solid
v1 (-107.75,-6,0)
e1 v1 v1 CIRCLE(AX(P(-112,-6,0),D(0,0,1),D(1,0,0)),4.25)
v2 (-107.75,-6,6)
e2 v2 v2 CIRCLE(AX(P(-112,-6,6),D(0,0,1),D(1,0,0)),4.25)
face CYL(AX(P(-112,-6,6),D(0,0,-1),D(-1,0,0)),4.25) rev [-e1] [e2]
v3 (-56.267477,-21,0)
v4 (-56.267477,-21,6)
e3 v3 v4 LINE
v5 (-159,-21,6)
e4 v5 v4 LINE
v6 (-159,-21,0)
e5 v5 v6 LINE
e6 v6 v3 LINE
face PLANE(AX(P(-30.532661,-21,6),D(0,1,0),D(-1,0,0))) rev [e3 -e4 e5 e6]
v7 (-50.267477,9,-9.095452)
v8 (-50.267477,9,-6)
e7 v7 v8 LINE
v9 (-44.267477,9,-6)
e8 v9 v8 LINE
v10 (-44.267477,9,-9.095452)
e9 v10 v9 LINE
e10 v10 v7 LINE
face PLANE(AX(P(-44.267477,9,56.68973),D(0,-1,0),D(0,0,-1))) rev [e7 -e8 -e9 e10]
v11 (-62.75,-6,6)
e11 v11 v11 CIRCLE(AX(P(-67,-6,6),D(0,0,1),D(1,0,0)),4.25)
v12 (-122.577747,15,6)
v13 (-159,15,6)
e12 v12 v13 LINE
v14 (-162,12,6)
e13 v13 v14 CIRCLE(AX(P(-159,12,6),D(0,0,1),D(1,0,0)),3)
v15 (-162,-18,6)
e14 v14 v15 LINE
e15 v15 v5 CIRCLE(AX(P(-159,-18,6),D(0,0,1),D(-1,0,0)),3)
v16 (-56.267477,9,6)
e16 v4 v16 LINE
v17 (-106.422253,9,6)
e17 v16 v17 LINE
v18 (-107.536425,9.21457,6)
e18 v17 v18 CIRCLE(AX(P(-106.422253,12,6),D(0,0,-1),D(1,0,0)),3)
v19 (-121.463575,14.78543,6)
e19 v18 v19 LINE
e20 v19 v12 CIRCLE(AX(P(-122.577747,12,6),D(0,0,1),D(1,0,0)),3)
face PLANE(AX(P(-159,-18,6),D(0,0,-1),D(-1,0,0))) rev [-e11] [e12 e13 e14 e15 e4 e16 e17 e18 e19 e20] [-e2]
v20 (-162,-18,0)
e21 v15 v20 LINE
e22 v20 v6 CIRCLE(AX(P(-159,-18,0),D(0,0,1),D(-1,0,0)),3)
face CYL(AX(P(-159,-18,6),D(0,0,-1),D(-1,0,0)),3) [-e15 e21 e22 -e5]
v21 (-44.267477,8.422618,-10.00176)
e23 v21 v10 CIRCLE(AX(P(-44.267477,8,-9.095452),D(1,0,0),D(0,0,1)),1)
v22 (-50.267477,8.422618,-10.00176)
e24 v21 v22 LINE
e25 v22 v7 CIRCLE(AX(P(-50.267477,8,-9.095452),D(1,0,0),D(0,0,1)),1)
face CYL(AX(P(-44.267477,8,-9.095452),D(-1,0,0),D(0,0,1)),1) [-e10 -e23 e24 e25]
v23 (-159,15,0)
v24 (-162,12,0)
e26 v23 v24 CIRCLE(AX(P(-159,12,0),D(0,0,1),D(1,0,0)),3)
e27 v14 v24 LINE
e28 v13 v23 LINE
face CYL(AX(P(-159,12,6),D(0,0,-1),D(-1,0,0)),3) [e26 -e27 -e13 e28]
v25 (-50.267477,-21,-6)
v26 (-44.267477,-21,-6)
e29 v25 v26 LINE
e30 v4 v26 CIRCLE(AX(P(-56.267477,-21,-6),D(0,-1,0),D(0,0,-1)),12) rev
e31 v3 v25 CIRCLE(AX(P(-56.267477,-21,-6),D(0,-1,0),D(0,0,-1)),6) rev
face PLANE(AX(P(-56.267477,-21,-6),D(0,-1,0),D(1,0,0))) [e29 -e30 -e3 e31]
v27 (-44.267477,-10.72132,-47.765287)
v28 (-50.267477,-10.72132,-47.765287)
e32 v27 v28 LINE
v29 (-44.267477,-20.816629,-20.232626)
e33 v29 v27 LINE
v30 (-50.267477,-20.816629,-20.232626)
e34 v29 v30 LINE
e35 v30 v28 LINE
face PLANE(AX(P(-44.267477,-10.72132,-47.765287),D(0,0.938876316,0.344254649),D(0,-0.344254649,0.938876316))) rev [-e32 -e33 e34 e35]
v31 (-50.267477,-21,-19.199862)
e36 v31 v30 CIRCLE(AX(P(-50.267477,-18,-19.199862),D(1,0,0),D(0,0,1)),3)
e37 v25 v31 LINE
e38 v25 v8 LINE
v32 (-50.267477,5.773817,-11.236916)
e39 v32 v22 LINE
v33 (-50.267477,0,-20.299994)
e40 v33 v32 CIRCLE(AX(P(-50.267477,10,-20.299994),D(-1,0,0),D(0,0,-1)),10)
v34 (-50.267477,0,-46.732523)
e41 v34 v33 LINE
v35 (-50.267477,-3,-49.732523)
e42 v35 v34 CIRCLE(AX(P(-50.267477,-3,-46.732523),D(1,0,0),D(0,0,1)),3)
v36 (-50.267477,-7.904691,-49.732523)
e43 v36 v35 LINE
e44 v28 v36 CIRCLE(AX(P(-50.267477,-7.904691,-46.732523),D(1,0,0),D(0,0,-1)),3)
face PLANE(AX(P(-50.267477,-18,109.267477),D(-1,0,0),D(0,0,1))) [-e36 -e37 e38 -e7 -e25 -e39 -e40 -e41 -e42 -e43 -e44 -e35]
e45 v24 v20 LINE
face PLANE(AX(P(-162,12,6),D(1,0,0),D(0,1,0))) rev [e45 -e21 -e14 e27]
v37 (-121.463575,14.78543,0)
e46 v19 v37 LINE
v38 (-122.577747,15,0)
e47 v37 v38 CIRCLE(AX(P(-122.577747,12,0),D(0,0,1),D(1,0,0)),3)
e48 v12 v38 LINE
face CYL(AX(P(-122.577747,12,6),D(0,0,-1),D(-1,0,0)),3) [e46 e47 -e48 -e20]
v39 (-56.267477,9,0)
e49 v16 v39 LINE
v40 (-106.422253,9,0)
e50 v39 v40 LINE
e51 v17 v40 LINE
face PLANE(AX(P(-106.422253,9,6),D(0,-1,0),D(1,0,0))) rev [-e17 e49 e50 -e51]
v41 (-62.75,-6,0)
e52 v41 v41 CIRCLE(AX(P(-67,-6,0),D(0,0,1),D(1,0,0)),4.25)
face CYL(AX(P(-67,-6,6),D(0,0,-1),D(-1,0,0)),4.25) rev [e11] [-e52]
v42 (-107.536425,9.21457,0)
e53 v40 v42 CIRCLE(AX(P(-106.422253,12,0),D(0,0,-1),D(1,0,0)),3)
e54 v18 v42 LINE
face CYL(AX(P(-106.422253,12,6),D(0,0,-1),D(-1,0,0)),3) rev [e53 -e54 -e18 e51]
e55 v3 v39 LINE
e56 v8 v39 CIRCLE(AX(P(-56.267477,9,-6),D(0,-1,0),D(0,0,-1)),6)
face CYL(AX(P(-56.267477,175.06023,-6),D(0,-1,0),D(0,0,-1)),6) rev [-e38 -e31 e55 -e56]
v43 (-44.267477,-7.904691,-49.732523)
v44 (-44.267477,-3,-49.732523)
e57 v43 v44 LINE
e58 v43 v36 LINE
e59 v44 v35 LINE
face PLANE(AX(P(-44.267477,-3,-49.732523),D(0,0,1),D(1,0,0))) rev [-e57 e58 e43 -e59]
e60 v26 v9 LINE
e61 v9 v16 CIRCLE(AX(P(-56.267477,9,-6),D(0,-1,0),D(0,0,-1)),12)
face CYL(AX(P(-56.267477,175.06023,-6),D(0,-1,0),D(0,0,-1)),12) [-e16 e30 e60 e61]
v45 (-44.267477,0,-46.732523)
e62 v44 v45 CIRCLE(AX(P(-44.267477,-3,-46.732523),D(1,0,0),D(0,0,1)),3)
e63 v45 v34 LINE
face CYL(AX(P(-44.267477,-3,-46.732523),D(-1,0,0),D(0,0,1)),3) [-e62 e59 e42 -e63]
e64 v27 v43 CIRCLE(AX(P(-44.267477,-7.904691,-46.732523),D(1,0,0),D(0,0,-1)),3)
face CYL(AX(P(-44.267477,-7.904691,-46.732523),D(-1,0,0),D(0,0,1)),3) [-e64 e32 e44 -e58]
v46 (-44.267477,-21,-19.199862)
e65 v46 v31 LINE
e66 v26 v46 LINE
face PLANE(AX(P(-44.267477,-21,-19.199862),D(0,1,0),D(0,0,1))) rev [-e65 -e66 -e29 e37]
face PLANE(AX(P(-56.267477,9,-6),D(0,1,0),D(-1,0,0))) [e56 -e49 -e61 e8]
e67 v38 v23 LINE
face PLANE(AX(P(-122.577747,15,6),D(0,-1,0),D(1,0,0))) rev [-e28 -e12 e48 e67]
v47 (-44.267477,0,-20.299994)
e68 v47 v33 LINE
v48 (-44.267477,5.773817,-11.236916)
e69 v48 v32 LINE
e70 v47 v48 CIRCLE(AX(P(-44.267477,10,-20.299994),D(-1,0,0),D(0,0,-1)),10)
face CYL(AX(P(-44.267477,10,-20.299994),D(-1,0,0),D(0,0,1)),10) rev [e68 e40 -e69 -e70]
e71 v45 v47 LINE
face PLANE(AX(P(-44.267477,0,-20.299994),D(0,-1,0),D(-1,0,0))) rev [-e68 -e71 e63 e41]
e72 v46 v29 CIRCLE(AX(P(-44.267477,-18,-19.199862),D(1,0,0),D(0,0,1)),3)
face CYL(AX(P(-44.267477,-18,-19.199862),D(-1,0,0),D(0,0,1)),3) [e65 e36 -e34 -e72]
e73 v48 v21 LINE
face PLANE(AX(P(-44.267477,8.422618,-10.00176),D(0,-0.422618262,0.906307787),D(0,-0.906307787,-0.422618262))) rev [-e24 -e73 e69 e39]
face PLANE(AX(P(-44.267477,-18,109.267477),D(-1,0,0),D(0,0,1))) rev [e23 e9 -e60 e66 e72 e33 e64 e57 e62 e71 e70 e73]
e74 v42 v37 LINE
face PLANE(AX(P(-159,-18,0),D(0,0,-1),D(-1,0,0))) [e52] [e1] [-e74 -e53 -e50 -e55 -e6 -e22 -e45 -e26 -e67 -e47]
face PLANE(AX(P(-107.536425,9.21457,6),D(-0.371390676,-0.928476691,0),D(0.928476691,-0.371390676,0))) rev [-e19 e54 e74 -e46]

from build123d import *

# Parameters (mm, degrees)
SKETCH1_R                = 4.25
EXTRUDE1_DEPTH           = 6
PROCESS_BENDS1_START     = -45.500357344
PROCESS_BENDS1_OUTLINE_W = 30
PROCESS_BENDS1_OUTLINE_H = 6
PROCESS_BENDS1_DEPTH     = 45.500357344
PROCESS_BENDS1_START_2   = -50.267477344
PROCESS_BENDS1_2_DEPTH   = 4.83288
PROCESS_BENDS1_START_3   = -56.267477344
PROCESS_BENDS1_3_DEPTH   = 6
PROCESS_BENDS1_START_4   = -45.434597344
PROCESS_BENDS1_4_DEPTH   = 1.16712
PROCESS_BENDS1_START_5   = -21
PROCESS_BENDS1_5_DEPTH   = 30


with BuildPart() as part:
    # Sketch1 → Extrude1 (new body)
    with BuildSketch(Plane.XY):
        with BuildLine():
            Line((-106.422252789, 9), (-40.637070261, 9))
            ThreePointArc((-40.637070261, 9), (-40.099770652, 8.843391446), (-39.730762474, 8.422618262))
            Line((-39.730762474, 8.422618262), (-38.495606339, 5.773817383))
            ThreePointArc((-38.495606339, 5.773817383), (-34.805524552, 1.566085542), (-29.432528469, 0))
            Line((-29.432528469, 0), (-3, 0))
            ThreePointArc((-3, 0), (-0.878679656, -0.878679656), (0, -3))
            Line((0, -3), (0, -7.904690938))
            ThreePointArc((0, -7.904690938), (-0.540498847, -9.622495956), (-1.967236053, -10.721319886))
            Line((-1.967236053, -10.721319886), (-29.49989713, -20.816628948))
            ThreePointArc((-29.49989713, -20.816628948), (-30.008202711, -20.95380152), (-30.532661077, -21))
            Line((-30.532661077, -21), (-159, -21))
            ThreePointArc((-159, -21), (-161.121320344, -20.121320344), (-162, -18))
            Line((-162, -18), (-162, 12))
            ThreePointArc((-162, 12), (-161.121320344, 14.121320344), (-159, 15))
            Line((-159, 15), (-122.577747211, 15))
            ThreePointArc((-122.577747211, 15), (-122.010424647, 14.94586916), (-121.463575182, 14.785430073))
            Line((-121.463575182, 14.785430073), (-107.536424818, 9.214569927))
            ThreePointArc((-107.536424818, 9.214569927), (-106.989575353, 9.05413084), (-106.422252789, 9))
        make_face()
        with Locations((-67, -6)):
            Circle(SKETCH1_R, mode=Mode.SUBTRACT)
        with Locations((-112, -6)):
            Circle(SKETCH1_R, mode=Mode.SUBTRACT)
    extrude(amount=EXTRUDE1_DEPTH)

    # Process-Bends1: read off the stored shape, not the designer's step
    # Process-Bends1 outline → Process-Bends1 (cut)
    with BuildSketch(Plane.YZ.offset(PROCESS_BENDS1_START)):
        with Locations((-6, 3)):
            Rectangle(PROCESS_BENDS1_OUTLINE_W, PROCESS_BENDS1_OUTLINE_H)
    extrude(amount=PROCESS_BENDS1_DEPTH, mode=Mode.SUBTRACT)

    # Process-Bends1 2 outline → Process-Bends1 2 (add)
    with BuildSketch(Plane.YZ.offset(PROCESS_BENDS1_START_2)):
        with BuildLine():
            Line((5.773817383, -11.236916317), (8.422618262, -10.001760182))
            ThreePointArc((8.422618262, -10.001760182), (8.843391446, -9.632752004), (9, -9.095452395))
            Line((9, -9.095452395), (9, 0))
            Line((9, 0), (-21, 0))
            Line((-21, 0), (-21, -19.199861579))
            ThreePointArc((-21, -19.199861579), (-20.95380152, -19.724319945), (-20.816628948, -20.232625526))
            Line((-20.816628948, -20.232625526), (-10.721319886, -47.765286604))
            ThreePointArc((-10.721319886, -47.765286604), (-9.622495956, -49.192023809), (-7.904690938, -49.732522656))
            Line((-7.904690938, -49.732522656), (-3, -49.732522656))
            ThreePointArc((-3, -49.732522656), (-0.878679656, -48.853843), (0, -46.732522656))
            Line((0, -46.732522656), (0, -20.299994188))
            ThreePointArc((0, -20.299994188), (1.566085542, -14.926998104), (5.773817383, -11.236916317))
        make_face()
    extrude(amount=PROCESS_BENDS1_2_DEPTH)

    # Process-Bends1 3 outline → Process-Bends1 3 (add)
    with BuildSketch(Plane.YZ.offset(PROCESS_BENDS1_START_3)):
        with BuildLine():
            Line((5.773817383, -11.236916317), (8.422618262, -10.001760182))
            ThreePointArc((8.422618262, -10.001760182), (8.843391446, -9.632752004), (9, -9.095452395))
            Line((9, -9.095452395), (9, 0))
            Line((9, 0), (-21, 0))
            Line((-21, 0), (-21, -19.199861579))
            ThreePointArc((-21, -19.199861579), (-20.95380152, -19.724319945), (-20.816628948, -20.232625526))
            Line((-20.816628948, -20.232625526), (-10.721319886, -47.765286604))
            ThreePointArc((-10.721319886, -47.765286604), (-9.622495956, -49.192023809), (-7.904690938, -49.732522656))
            Line((-7.904690938, -49.732522656), (-3, -49.732522656))
            ThreePointArc((-3, -49.732522656), (-0.878679656, -48.853843), (0, -46.732522656))
            Line((0, -46.732522656), (0, -20.299994188))
            ThreePointArc((0, -20.299994188), (1.566085542, -14.926998104), (5.773817383, -11.236916317))
        make_face()
    extrude(amount=PROCESS_BENDS1_3_DEPTH)

    # Process-Bends1 4 outline → Process-Bends1 4 (add)
    with BuildSketch(Plane.YZ.offset(PROCESS_BENDS1_START_4)):
        with BuildLine():
            Line((5.773817383, -11.236916317), (8.422618262, -10.001760182))
            ThreePointArc((8.422618262, -10.001760182), (8.843391446, -9.632752004), (9, -9.095452395))
            Line((9, -9.095452395), (9, 0))
            Line((9, 0), (-21, 0))
            Line((-21, 0), (-21, -19.199861579))
            ThreePointArc((-21, -19.199861579), (-20.95380152, -19.724319945), (-20.816628948, -20.232625526))
            Line((-20.816628948, -20.232625526), (-10.721319886, -47.765286604))
            ThreePointArc((-10.721319886, -47.765286604), (-9.622495956, -49.192023809), (-7.904690938, -49.732522656))
            Line((-7.904690938, -49.732522656), (-3, -49.732522656))
            ThreePointArc((-3, -49.732522656), (-0.878679656, -48.853843), (0, -46.732522656))
            Line((0, -46.732522656), (0, -20.299994188))
            ThreePointArc((0, -20.299994188), (1.566085542, -14.926998104), (5.773817383, -11.236916317))
        make_face()
    extrude(amount=PROCESS_BENDS1_4_DEPTH)

    # Process-Bends1 5 outline → Process-Bends1 5 (cut)
    with BuildSketch(Plane(origin=(0, 0, 0), x_dir=(1, 0, 0), z_dir=(0, 1, 0)).offset(PROCESS_BENDS1_START_5)):
        with BuildLine():
            Line((-50.267477344, 6), (-50.267477344, 49.732522656))
            Line((-50.267477344, 49.732522656), (-56.267477344, 49.732522656))
            Line((-56.267477344, 49.732522656), (-56.267477344, 0))
            ThreePointArc((-56.267477344, 0), (-52.024836657, 1.757359313), (-50.267477344, 6))
        make_face()
        with BuildLine():
            Line((-44.267477344, 0), (-44.267477344, 6))
            ThreePointArc((-44.267477344, 6), (-47.78219597, -2.485281374), (-56.267477344, -6))
            Line((-56.267477344, -6), (-45.500357344, -6))
            Line((-45.500357344, -6), (-45.500357344, 0))
            Line((-45.500357344, 0), (-44.267477344, 0))
        make_face()
    extrude(amount=PROCESS_BENDS1_5_DEPTH, mode=Mode.SUBTRACT)


solid = part.part
